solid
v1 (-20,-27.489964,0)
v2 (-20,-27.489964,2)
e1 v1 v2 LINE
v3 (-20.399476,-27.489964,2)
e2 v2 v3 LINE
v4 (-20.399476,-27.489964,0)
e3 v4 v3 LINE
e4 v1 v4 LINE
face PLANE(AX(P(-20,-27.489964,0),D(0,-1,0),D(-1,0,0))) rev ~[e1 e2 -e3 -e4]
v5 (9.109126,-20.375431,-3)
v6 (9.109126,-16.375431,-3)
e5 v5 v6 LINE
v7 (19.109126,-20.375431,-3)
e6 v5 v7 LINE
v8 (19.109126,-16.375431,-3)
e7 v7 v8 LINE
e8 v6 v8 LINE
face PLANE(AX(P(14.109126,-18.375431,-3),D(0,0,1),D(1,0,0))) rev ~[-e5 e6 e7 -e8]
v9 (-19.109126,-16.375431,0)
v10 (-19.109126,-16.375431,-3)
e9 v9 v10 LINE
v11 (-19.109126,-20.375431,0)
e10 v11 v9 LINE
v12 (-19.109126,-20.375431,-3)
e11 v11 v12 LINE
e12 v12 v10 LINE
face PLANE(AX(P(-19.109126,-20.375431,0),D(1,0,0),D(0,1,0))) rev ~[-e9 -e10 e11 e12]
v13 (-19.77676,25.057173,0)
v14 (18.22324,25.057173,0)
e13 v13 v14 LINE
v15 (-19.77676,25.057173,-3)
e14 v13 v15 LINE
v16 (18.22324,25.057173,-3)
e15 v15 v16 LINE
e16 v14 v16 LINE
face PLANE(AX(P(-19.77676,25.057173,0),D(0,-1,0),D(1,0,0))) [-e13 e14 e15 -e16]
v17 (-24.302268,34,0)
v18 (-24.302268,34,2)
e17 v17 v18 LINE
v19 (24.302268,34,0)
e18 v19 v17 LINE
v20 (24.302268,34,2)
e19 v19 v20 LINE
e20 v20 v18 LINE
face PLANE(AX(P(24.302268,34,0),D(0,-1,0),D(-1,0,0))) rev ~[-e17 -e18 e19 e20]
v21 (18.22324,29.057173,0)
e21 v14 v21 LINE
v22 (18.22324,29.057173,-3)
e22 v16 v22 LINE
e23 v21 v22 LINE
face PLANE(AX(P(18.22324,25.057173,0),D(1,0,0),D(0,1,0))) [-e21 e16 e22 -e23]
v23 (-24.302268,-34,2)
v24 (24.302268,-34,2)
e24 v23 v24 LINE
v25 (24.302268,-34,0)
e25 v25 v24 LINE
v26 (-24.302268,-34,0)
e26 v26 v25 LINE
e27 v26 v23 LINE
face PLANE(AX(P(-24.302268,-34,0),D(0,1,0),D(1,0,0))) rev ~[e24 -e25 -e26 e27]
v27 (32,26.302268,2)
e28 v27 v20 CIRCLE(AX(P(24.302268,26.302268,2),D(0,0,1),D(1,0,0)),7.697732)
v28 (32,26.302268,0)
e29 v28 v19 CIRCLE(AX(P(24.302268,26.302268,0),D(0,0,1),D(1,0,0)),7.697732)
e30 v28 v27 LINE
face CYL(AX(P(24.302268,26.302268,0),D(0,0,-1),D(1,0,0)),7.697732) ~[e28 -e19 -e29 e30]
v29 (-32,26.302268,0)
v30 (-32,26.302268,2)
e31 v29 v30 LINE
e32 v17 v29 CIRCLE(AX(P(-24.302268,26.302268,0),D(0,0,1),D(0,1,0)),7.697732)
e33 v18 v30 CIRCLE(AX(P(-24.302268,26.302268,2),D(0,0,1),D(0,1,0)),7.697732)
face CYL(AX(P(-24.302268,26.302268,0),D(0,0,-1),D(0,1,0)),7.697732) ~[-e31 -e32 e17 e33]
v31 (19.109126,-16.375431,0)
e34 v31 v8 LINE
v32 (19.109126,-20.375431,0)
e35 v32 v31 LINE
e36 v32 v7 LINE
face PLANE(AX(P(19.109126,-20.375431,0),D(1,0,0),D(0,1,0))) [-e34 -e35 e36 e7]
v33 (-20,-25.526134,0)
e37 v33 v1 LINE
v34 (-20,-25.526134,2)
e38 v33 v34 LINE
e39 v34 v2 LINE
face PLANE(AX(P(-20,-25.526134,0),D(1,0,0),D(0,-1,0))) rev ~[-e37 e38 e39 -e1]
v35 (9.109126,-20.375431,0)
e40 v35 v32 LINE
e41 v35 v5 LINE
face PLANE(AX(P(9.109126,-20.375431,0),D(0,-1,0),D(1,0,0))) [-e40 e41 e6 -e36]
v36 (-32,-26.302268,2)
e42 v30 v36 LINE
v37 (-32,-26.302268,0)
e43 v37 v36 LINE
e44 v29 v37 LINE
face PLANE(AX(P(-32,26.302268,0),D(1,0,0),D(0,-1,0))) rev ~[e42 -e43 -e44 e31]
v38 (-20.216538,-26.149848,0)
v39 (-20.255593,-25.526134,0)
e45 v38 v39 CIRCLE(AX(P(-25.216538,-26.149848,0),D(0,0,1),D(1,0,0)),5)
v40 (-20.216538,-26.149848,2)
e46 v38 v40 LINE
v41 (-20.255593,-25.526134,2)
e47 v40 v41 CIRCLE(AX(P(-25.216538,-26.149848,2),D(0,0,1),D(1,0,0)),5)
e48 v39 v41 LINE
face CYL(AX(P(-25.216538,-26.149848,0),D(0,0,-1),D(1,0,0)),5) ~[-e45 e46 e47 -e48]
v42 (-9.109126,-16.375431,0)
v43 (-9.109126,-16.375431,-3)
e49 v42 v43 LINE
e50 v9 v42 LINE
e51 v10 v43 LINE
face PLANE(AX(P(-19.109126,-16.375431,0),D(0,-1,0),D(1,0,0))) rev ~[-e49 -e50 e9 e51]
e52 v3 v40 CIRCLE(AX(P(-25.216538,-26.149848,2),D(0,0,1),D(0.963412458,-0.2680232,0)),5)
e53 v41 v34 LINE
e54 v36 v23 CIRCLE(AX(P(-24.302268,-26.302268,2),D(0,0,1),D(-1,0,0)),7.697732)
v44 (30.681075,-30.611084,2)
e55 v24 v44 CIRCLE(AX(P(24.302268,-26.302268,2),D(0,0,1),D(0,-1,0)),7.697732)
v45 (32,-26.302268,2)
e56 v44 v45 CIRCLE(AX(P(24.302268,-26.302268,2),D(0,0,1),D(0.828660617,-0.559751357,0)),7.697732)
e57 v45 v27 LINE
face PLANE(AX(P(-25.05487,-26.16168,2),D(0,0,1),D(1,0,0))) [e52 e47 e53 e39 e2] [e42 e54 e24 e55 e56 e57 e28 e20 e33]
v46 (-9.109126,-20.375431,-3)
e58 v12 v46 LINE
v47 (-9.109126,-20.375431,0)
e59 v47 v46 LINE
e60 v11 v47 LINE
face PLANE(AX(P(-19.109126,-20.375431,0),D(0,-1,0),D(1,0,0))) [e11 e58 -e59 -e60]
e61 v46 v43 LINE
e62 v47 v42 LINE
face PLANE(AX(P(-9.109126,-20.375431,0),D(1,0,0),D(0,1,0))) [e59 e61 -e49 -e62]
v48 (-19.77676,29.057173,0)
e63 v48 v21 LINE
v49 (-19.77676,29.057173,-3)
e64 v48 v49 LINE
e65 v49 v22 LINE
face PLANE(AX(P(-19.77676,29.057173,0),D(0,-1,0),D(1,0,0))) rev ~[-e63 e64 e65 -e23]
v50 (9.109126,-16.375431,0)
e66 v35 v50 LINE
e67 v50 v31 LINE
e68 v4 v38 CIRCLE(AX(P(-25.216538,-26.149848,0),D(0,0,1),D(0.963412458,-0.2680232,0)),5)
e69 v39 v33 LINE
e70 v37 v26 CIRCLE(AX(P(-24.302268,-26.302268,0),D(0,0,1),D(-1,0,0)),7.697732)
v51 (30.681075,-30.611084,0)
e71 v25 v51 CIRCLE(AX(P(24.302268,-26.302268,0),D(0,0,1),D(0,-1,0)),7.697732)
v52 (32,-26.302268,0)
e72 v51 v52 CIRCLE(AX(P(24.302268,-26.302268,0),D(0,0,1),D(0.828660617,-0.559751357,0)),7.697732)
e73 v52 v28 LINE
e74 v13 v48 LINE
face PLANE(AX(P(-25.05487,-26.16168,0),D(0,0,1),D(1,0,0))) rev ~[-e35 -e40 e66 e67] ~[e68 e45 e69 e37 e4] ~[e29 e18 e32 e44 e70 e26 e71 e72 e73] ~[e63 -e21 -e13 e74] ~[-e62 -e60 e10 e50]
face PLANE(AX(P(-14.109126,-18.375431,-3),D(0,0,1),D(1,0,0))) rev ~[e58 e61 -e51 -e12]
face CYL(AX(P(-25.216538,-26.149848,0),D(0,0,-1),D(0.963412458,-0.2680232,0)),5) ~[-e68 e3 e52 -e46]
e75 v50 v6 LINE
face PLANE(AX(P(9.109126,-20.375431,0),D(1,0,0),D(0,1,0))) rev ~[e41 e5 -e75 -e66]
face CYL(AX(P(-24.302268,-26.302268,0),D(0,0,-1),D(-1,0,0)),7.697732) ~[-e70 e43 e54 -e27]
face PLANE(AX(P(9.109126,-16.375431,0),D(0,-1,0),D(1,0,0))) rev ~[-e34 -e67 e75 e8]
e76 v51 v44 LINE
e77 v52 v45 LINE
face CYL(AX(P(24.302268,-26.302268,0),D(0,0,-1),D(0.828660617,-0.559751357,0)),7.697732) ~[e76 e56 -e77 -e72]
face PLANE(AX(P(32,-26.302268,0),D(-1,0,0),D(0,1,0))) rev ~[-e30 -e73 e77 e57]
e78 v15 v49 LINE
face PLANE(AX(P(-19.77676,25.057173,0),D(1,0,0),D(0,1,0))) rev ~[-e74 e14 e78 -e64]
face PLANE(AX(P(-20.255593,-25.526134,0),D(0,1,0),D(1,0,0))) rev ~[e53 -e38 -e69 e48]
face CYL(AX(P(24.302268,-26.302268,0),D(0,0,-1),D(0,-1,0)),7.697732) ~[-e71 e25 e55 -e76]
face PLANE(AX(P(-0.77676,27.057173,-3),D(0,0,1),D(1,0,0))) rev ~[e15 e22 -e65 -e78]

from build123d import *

# Parameters (mm, degrees)
F1_DEPTH = 2
F2_DEPTH = 2
F4_W     = 38
F4_H     = 4
F4_W_2   = 10
F5_DEPTH = 3


# Not quite as in the source:
# - a feature names something its author has since deleted; it is built from what else it names


with BuildPart() as f1:
    # F0 (on Top) → F1 (new body)
    with BuildSketch(Plane.XY):
        with BuildLine():
            Line((24.3022678875, 34), (-24.3022678875, 34))
            ThreePointArc((-24.3022678875, 34), (-29.745386464, 31.745386464), (-32, 26.3022678875))
            Line((-32, 26.3022678875), (-32, 15.1276998222))
            Line((-32, 15.1276998222), (-30.5, 15.1276998222))
            Line((-30.5, 15.1276998222), (-30.5, 21.3020170704))
            Line((-30.5, 21.3020170704), (30.5, 21.3020170704))
            Line((30.5, 21.3020170704), (30.5, 14.2477769405))
            Line((30.5, 14.2477769405), (32, 14.2477769405))
            Line((32, 14.2477769405), (32, 26.3022678875))
            ThreePointArc((32, 26.3022678875), (29.745386464, 31.745386464), (24.3022678875, 34))
        make_face()
        with BuildLine():
            Line((-30.5, 15.1276998222), (-32, 15.1276998222))
            Line((-32, 15.1276998222), (-32, -26.3022678875))
            ThreePointArc((-32, -26.3022678875), (-29.745386464, -31.745386464), (-24.3022678875, -34))
            Line((-24.3022678875, -34), (0, -34))
            Line((0, -34), (24.3022678875, -34))
            ThreePointArc((24.3022678875, -34), (27.9138443036, -33.100178998), (30.6810753302, -30.6110838832))
            ThreePointArc((30.6810753302, -30.6110838832), (31.6628871063, -28.555346757), (32, -26.3022678875))
            Line((32, -26.3022678875), (32, 14.2477769405))
            Line((32, 14.2477769405), (30.5, 14.2477769405))
            Line((30.5, 14.2477769405), (30.5, -14.6979829296))
            Line((30.5, -14.6979829296), (-30.5, -14.6979829296))
            Line((-30.5, -14.6979829296), (-30.5, 15.1276998222))
        make_face()
        with BuildLine():
            ThreePointArc((-20.3994758379, -27.4899639189), (-30.2031719041, -25.7844938681), (-20.255592559, -25.5261339915))
            Line((-20.255592559, -25.5261339915), (-20, -25.5261339915))
            Line((-20, -25.5261339915), (-20, -27.4899639189))
            Line((-20, -27.4899639189), (-20.3994758379, -27.4899639189))
        make_face(mode=Mode.SUBTRACT)
        with BuildLine():
            ThreePointArc((20.2726339823, -25.4029799253), (25.5910239568, -21.1638916046), (30.2165381279, -26.1498479185))
            ThreePointArc((30.2165381279, -26.1498479185), (25.7296627026, -31.1234485429), (20.3218568596, -27.1706786007))
            ThreePointArc((20.3218568596, -27.1706786007), (20.2184754644, -26.2890226707), (20.2726339823, -25.4029799253))
        make_face(mode=Mode.SUBTRACT)
        Polygon((-30.5, 21.3020170704), (-30.5, 15.1276998222), (-30.5, -14.6979829296), (30.5, -14.6979829296), (30.5, 14.2477769405), (30.5, 21.3020170704), align=None)
    extrude(amount=F1_DEPTH)

    # F0 (on Top) → F2 (join)
    with BuildSketch(Plane.XY):
        with BuildLine():
            ThreePointArc((-20.3994758379, -27.4899639189), (-20.2624836545, -26.8261202565), (-20.2165381279, -26.1498479185))
            ThreePointArc((-20.2165381279, -26.1498479185), (-20.2263112871, -25.8373801956), (-20.255592559, -25.5261339915))
            ThreePointArc((-20.255592559, -25.5261339915), (-30.2031719041, -25.7844938681), (-20.3994758379, -27.4899639189))
        make_face()
        with BuildLine():
            ThreePointArc((20.3218568596, -27.1706786007), (25.7296627026, -31.1234485429), (30.2165381279, -26.1498479185))
            ThreePointArc((30.2165381279, -26.1498479185), (25.5910239568, -21.1638916046), (20.2726339823, -25.4029799253))
            ThreePointArc((20.2726339823, -25.4029799253), (20.2184754644, -26.2890226707), (20.3218568596, -27.1706786007))
        make_face()
    extrude(amount=F2_DEPTH)

    # F4 (on face) → F5 (join)
    with BuildSketch(Plane.XY):
        with Locations((-0.7767596692, 27.0571730584)):
            Rectangle(F4_W, F4_H)
        with Locations((14.1091264039, -18.375430584)):
            Rectangle(F4_W_2, F4_H)
        with Locations((-14.1091264039, -18.375430584)):
            Rectangle(F4_W_2, F4_H)
    extrude(amount=-F5_DEPTH)


solid = f1.part
